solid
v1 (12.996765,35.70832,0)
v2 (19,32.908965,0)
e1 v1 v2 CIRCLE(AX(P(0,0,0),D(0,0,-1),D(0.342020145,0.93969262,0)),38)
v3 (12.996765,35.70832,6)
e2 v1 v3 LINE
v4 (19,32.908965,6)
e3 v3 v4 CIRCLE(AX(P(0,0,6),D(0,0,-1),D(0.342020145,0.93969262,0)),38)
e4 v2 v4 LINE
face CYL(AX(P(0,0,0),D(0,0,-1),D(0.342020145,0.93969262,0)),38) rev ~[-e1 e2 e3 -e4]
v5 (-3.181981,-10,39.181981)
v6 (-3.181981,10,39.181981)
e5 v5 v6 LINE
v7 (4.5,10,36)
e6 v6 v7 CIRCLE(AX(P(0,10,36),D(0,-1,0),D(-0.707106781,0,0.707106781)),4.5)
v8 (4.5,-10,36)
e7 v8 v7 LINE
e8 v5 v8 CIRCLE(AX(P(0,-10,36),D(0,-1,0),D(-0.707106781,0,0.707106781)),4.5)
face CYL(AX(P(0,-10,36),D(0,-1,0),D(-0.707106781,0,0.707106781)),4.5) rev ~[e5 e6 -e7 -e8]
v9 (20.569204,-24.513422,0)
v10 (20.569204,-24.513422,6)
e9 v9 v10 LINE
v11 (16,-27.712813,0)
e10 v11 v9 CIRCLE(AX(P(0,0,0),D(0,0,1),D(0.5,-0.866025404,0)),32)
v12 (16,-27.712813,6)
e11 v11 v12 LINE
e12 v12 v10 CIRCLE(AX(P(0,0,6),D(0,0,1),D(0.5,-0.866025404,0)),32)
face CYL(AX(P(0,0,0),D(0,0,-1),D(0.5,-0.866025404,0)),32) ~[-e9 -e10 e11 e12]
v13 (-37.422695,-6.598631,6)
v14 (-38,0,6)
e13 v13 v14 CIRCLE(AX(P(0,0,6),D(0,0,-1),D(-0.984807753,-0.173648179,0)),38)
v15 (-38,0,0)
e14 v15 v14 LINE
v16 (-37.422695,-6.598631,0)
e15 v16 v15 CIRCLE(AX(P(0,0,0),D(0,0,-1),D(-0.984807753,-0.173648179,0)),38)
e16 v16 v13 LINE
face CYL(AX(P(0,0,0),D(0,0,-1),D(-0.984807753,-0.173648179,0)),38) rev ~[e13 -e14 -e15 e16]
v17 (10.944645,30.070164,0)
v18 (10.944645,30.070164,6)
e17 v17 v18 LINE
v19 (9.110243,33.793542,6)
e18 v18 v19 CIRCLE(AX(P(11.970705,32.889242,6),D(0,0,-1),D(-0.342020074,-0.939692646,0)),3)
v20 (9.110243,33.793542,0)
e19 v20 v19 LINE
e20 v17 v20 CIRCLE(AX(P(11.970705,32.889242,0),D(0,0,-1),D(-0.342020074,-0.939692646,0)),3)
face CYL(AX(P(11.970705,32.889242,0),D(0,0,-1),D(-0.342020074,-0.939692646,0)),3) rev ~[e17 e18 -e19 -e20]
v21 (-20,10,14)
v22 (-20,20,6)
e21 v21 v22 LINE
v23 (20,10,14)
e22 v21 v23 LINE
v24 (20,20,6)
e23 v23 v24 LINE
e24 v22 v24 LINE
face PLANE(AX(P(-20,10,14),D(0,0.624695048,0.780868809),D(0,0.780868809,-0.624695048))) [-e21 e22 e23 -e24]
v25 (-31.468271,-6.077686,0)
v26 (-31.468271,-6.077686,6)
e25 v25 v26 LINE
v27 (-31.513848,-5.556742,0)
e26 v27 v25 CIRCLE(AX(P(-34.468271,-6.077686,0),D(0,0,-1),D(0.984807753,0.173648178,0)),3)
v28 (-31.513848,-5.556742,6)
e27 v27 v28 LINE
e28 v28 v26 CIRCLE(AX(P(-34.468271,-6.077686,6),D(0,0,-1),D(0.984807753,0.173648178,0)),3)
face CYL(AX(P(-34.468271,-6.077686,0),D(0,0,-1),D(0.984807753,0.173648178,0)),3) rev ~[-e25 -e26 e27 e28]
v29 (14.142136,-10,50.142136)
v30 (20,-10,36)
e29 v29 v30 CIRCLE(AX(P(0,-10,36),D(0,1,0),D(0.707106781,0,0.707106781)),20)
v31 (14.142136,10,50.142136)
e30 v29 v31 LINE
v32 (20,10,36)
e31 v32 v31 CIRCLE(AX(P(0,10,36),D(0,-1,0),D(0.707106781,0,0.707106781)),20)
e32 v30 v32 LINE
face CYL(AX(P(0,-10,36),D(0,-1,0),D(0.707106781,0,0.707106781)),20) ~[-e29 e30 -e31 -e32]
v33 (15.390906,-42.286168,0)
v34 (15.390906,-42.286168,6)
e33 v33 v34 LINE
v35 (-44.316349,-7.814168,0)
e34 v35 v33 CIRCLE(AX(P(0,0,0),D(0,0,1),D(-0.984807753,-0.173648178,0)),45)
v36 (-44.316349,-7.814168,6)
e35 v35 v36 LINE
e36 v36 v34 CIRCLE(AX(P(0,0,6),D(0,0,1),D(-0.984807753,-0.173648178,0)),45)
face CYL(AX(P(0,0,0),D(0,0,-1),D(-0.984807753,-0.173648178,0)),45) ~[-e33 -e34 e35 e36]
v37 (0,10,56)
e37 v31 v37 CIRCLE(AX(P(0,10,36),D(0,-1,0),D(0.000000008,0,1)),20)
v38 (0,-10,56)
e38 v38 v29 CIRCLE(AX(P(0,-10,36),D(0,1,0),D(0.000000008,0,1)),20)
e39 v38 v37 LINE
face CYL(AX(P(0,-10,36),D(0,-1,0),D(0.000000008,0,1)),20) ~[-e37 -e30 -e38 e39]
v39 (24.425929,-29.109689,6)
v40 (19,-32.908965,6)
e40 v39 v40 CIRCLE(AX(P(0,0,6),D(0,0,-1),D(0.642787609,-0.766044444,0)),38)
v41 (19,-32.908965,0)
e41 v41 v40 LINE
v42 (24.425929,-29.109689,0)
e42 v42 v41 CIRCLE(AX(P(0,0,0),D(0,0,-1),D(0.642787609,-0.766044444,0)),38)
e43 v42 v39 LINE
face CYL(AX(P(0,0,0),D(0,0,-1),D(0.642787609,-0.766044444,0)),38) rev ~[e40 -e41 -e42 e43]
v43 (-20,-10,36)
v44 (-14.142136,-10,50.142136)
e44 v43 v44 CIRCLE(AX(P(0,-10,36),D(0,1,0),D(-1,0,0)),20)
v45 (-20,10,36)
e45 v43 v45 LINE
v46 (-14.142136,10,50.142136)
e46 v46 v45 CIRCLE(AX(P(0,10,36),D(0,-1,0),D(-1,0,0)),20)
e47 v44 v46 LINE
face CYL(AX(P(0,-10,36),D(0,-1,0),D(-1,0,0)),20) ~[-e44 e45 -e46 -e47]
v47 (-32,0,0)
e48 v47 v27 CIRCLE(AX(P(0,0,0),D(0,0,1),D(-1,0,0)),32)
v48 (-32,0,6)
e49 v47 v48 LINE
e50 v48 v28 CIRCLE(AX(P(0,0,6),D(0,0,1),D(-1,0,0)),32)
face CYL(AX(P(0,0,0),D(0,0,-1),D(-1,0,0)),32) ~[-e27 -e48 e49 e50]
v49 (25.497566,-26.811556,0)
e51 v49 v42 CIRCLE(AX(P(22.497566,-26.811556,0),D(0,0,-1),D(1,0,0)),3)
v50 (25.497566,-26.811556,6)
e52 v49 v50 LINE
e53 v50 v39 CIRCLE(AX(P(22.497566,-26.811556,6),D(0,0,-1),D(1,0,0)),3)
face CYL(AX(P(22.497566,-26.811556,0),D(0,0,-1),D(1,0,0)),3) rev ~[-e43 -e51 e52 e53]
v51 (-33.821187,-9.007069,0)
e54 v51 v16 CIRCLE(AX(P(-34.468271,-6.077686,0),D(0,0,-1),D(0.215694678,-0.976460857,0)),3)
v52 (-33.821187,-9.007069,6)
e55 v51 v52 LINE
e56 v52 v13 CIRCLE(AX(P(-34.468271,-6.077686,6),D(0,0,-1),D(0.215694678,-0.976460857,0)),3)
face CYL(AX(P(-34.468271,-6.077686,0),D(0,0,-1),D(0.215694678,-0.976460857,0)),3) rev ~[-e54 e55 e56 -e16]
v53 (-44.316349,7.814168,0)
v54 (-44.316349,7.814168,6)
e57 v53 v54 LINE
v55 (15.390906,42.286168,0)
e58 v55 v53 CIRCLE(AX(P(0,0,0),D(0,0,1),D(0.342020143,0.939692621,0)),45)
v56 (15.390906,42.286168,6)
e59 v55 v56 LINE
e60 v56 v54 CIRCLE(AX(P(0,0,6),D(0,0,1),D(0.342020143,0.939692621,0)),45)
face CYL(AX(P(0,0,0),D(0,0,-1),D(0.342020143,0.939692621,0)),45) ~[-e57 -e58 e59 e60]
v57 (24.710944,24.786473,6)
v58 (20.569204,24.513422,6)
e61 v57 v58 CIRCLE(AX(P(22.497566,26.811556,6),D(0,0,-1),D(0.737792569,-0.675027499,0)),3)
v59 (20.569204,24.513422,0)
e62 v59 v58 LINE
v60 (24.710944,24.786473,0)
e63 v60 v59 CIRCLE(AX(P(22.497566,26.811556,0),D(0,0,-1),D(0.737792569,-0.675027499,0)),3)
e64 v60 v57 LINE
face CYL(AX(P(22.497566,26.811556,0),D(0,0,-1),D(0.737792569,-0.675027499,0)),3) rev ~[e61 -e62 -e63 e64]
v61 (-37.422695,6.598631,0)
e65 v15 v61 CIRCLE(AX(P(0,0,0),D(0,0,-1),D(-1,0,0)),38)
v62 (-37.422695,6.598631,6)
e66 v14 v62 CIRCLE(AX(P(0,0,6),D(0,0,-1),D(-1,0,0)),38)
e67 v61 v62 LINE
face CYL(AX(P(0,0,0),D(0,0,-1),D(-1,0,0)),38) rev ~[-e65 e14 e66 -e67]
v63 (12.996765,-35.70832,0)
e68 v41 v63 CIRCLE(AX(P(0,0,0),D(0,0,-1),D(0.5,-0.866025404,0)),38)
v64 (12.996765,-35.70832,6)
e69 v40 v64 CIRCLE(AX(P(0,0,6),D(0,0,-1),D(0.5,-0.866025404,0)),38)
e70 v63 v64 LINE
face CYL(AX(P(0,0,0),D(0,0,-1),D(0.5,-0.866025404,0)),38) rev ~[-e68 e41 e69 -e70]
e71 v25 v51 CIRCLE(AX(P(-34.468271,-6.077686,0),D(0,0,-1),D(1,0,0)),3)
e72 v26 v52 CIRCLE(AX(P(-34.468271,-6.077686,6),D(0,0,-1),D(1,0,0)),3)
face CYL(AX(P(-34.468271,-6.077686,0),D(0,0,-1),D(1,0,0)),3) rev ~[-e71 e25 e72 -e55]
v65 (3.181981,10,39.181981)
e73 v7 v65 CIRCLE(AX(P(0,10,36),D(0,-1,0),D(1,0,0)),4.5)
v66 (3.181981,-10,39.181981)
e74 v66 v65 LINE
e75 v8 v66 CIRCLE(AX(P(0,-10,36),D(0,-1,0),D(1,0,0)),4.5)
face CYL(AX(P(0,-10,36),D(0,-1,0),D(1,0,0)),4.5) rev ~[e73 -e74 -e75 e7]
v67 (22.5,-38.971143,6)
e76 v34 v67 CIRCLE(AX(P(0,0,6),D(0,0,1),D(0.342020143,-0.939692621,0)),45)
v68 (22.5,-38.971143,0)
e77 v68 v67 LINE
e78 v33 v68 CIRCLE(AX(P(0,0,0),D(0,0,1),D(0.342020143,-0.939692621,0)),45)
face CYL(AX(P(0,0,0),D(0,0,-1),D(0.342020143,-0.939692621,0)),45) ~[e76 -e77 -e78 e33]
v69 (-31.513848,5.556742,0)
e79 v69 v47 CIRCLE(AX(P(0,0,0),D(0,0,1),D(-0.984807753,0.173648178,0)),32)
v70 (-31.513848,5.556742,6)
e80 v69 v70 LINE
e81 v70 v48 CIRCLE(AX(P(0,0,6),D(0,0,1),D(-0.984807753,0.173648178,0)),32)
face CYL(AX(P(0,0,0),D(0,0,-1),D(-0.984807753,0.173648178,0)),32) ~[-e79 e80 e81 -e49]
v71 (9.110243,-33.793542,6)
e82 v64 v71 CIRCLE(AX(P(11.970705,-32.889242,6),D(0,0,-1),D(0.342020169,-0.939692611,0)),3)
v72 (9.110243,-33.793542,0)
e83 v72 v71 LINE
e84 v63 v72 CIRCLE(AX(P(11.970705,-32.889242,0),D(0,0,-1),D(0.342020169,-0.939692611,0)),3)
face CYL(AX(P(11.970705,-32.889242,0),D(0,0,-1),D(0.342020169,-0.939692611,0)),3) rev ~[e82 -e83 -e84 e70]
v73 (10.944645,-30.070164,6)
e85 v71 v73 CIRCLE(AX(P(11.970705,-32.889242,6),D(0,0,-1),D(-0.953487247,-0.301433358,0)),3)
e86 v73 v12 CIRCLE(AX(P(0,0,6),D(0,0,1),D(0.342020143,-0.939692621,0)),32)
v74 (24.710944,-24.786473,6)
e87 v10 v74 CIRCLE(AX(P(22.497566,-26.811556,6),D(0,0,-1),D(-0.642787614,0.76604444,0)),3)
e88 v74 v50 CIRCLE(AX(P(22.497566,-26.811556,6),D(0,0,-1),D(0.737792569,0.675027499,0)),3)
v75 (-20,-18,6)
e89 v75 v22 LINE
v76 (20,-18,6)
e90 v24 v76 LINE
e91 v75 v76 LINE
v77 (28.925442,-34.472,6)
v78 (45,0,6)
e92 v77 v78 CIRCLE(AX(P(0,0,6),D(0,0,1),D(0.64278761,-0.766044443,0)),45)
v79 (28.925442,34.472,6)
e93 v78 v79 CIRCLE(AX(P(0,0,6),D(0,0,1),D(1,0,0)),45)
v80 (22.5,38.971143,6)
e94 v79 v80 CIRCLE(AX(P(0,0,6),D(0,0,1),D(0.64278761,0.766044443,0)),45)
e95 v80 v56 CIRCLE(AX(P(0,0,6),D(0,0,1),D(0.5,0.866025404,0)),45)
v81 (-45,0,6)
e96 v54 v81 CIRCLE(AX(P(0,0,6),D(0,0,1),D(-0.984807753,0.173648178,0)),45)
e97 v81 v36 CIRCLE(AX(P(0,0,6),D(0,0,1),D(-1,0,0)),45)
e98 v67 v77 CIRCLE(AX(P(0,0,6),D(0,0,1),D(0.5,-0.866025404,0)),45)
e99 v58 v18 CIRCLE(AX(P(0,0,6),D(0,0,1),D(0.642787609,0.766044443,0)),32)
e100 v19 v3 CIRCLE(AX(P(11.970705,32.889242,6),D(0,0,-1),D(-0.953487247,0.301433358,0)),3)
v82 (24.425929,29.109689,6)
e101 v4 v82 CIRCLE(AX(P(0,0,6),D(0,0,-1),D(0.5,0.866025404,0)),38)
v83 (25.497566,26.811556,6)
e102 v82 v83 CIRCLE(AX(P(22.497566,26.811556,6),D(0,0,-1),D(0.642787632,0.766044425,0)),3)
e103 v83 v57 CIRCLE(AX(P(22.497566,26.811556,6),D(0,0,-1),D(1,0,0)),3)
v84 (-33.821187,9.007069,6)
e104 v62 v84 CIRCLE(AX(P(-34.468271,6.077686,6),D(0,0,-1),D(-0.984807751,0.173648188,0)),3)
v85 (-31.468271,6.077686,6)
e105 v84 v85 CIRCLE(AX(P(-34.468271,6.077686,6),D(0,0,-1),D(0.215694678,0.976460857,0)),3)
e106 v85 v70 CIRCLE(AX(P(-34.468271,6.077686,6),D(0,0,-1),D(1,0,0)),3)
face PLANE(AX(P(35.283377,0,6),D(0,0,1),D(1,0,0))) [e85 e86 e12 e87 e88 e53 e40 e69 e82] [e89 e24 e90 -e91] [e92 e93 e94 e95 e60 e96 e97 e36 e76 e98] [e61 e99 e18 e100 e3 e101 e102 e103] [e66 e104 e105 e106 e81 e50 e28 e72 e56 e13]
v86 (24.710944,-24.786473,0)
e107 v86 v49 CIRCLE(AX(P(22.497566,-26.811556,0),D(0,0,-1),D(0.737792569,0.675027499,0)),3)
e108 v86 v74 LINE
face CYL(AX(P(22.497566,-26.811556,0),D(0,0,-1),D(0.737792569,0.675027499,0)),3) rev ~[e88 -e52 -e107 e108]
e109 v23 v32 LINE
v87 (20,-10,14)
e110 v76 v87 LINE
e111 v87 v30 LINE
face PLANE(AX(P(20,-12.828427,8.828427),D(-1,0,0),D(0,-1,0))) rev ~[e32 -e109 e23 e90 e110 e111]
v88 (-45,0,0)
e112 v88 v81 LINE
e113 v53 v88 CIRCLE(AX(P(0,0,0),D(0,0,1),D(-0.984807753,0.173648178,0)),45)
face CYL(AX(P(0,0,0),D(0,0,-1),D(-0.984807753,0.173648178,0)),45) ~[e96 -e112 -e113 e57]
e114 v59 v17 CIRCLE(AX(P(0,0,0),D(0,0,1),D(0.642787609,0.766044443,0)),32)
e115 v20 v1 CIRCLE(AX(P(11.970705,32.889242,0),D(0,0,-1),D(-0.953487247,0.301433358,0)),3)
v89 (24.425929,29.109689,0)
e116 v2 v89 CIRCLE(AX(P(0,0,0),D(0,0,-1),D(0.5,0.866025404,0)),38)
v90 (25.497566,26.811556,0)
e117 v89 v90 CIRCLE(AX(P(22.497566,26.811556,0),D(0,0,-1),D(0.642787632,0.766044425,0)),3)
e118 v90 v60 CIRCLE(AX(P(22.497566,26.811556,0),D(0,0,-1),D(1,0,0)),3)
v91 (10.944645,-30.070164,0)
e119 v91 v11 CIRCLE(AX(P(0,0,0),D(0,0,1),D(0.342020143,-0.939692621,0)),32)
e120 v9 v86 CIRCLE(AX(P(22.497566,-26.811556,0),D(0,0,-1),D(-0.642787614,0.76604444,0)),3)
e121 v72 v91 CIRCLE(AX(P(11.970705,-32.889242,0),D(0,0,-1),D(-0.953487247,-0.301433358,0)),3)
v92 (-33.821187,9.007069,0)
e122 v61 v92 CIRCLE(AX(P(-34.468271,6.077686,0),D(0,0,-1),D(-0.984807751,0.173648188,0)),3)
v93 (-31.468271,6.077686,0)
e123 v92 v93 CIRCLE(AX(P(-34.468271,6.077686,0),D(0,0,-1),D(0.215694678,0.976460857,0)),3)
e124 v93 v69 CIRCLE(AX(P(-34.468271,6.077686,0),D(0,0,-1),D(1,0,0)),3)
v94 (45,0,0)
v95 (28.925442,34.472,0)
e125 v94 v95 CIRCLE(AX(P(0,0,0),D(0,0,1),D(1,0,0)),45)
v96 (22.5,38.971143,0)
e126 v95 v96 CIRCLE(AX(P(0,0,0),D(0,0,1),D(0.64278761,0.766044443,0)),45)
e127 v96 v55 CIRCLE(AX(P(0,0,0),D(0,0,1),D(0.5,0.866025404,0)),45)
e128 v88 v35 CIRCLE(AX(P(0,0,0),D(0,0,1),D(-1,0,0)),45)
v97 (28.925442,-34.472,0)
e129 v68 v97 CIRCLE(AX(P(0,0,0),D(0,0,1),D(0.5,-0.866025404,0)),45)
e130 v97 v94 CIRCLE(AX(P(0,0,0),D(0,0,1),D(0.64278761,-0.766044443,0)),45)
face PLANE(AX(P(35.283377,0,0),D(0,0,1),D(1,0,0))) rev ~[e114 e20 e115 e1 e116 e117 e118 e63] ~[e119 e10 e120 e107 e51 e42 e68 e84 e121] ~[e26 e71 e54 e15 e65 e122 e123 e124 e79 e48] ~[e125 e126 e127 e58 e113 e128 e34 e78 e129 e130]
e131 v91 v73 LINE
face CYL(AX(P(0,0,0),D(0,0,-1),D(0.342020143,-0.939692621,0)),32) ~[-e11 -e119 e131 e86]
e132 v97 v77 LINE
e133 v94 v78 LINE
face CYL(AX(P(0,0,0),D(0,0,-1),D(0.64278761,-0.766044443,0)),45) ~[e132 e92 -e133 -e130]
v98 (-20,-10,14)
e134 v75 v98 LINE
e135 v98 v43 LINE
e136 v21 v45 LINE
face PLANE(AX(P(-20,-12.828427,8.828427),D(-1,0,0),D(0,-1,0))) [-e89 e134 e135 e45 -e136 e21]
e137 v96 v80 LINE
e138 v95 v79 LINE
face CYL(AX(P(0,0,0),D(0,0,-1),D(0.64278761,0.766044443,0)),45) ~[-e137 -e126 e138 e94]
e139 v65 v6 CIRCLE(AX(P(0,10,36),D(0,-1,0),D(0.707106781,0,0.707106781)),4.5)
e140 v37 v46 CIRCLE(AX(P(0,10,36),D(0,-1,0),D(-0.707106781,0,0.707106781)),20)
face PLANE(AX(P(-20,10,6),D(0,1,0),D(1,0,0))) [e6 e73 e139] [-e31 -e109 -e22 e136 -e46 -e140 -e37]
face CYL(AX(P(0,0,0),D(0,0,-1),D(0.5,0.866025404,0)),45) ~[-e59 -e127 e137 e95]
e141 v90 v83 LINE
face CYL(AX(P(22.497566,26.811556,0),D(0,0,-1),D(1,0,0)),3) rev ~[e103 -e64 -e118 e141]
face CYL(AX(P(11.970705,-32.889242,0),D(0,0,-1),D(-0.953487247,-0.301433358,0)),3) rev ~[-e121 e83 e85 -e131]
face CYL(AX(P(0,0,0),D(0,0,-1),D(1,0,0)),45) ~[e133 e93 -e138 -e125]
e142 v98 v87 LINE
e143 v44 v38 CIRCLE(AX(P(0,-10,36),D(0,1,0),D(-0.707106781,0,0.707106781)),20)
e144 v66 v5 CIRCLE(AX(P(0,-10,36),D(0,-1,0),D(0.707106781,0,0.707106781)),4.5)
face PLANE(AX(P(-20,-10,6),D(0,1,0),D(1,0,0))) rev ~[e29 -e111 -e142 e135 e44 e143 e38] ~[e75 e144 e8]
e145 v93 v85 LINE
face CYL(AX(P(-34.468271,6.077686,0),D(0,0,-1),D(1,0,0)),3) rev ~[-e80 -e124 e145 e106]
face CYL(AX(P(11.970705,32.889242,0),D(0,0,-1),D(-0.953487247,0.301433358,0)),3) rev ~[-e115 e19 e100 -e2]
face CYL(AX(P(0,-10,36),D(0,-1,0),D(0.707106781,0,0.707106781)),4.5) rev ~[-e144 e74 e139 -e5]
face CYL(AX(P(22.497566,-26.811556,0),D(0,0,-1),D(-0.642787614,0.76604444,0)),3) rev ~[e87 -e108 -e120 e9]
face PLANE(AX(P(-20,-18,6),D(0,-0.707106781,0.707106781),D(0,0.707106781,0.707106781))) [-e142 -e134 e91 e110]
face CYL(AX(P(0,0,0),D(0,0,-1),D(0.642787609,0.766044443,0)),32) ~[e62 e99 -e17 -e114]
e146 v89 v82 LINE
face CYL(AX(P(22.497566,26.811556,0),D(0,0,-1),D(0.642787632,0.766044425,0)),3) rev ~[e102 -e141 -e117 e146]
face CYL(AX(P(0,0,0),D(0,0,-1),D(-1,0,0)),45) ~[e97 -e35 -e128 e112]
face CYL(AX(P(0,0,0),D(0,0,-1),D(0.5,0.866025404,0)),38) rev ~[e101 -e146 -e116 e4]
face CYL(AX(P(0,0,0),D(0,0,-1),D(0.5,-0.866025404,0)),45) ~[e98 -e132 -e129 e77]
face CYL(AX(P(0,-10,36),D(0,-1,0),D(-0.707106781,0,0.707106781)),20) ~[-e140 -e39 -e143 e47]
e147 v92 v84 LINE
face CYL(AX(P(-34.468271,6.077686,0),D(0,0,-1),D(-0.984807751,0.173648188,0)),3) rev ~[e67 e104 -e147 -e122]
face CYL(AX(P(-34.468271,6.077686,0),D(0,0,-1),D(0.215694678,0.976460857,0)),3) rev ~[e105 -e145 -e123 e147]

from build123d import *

# Parameters (mm, degrees)
F1_DEPTH = 6
F2_W     = 40
F2_H     = 20
F3_DEPTH = 50
F5_DEPTH = 40
F7_DEPTH = 30
F8_DEPTH = 30


# Not quite as in the source:
# - ends of sketch curves that miss each other by under 0.0002 mm in the source are joined


with BuildPart() as f1:
    # F0 (on Top) → F1 (new body)
    with BuildSketch(Plane.XY):
        with BuildLine():
            ThreePointArc((28.9254424359, -34.4719999404), (40.7838504166, -19.0178217783), (45, 0))
            ThreePointArc((45, 0), (40.7838504166, 19.0178217783), (28.9254424359, 34.4719999404))
            Line((28.9254424359, 34.4719999404), (24.4259291681, 29.1096888385))
            ThreePointArc((24.4259292345, 29.1096887828), (34.4396959257, 16.0594939069), (38, 0))
            ThreePointArc((38, 0), (34.4396959, -16.059493962), (24.4259291412, -29.1096888611))
            Line((24.4259291681, -29.1096888385), (28.9254424359, -34.4719999404))
        make_face()
        with BuildLine():
            ThreePointArc((22.5, -38.9711431703), (25.8109396358, -36.861841993), (28.9254424359, -34.4719999404))
            Line((28.9254424359, -34.4719999404), (24.4259291681, -29.1096888385))
            ThreePointArc((24.4259291412, -29.1096888611), (21.795904567, -31.127777693), (19, -32.9089653438))
            Line((19, -32.9089653438), (22.5, -38.9711431703))
        make_face()
        with BuildLine():
            ThreePointArc((15.3909064497, -42.2861679354), (19.0178217783, -40.7838504166), (22.5, -38.9711431703))
            Line((22.5, -38.9711431703), (19, -32.9089653438))
            ThreePointArc((19, -32.9089653438), (16.0594939837, -34.4396958899), (12.9967655243, -35.7083195615))
            Line((12.9967654464, -35.7083195899), (15.3909064497, -42.2861679354))
        make_face()
        with BuildLine():
            ThreePointArc((-44.3163488855, -7.814167995), (-22.5, -38.9711431703), (15.3909064497, -42.2861679354))
            Line((15.3909064497, -42.2861679354), (12.9967654464, -35.7083195899))
            ThreePointArc((12.9967655243, -35.7083195615), (-18.9999999457, -32.9089653752), (-37.4226946071, -6.5986307931))
            Line((-37.4226946145, -6.5986307513), (-44.3163488855, -7.814167995))
        make_face()
        with BuildLine():
            ThreePointArc((-37.4226946071, -6.5986307931), (-18.9999999457, -32.9089653752), (12.9967655243, -35.7083195615))
            ThreePointArc((12.9967655243, -35.7083195615), (10.6448654939, -35.5803659462), (9.1102432746, -33.7935418013))
            ThreePointArc((9.1102432746, -33.7935418013), (-17.5, -30.3108891325), (-33.8211873211, -9.0070687902))
            ThreePointArc((-33.8211873211, -9.0070687902), (-36.1359334802, -8.5714590704), (-37.4226946071, -6.5986307931))
        make_face()
        with BuildLine():
            ThreePointArc((-33.8211873211, -9.0070687902), (-17.5, -30.3108891325), (9.1102432746, -33.7935418013))
            ThreePointArc((9.1102432746, -33.7935418013), (9.2795808611, -31.5634020763), (10.9446447781, -30.0701637954))
            ThreePointArc((10.9446447781, -30.0701637954), (-15.9999999119, -27.712812972), (-31.5138480965, -5.5567416849))
            ThreePointArc((-31.5138480965, -5.5567416849), (-31.4796872612, -5.8162189899), (-31.4682713554, -6.0776862183))
            ThreePointArc((-31.4682713554, -6.0776862183), (-32.1293344064, -7.956349027), (-33.8211873211, -9.0070687902))
        make_face()
        with BuildLine():
            Line((10.9446445864, -30.0701638651), (0, 0))
            Line((0, 0), (-31.5138480964, -5.5567416853))
            ThreePointArc((-31.5138480964, -5.5567416853), (-15.9999999119, -27.712812972), (10.9446445864, -30.0701638651))
        make_face()
        with BuildLine():
            Line((-31.5138480964, -5.5567416853), (0, 0))
            Line((0, 0), (-32, 0))
            ThreePointArc((-32, 0), (-31.878230339, -2.7889837677), (-31.5138480965, -5.5567416849))
        make_face()
        with BuildLine():
            Line((-32, 0), (0, 0))
            Line((0, 0), (-31.5138480964, 5.5567416853))
            ThreePointArc((-31.5138480966, 5.5567416843), (-31.878230339, 2.7889837674), (-32, 0))
        make_face()
        with BuildLine():
            ThreePointArc((-45, 0), (-44.8287614141, -3.9220084236), (-44.3163488855, -7.814167995))
            Line((-44.3163488855, -7.814167995), (-37.4226946145, -6.5986307513))
            ThreePointArc((-37.4226946071, -6.5986307931), (-37.8553985256, -3.3119182456), (-38, 0))
            Line((-38, 0), (-45, 0))
        make_face()
        with BuildLine():
            Line((-37.4226946145, 6.5986307513), (-44.3163488855, 7.814167995))
            ThreePointArc((-44.3163488855, 7.814167995), (-44.8287614141, 3.9220084236), (-45, 0))
            Line((-45, 0), (-38, 0))
            ThreePointArc((-38, 0), (-37.8553985261, 3.3119182405), (-37.4226946089, 6.5986307831))
        make_face()
        with BuildLine():
            Line((12.9967654464, 35.7083195899), (15.3909064497, 42.2861679354))
            ThreePointArc((15.3909064497, 42.2861679354), (-22.5, 38.9711431703), (-44.3163488855, 7.814167995))
            Line((-44.3163488855, 7.814167995), (-37.4226946145, 6.5986307513))
            ThreePointArc((-37.4226946089, 6.5986307831), (-18.9999999501, 32.9089653726), (12.9967655243, 35.7083195615))
        make_face()
        with BuildLine():
            ThreePointArc((9.1102432746, 33.7935418013), (10.6448654939, 35.5803659462), (12.9967655243, 35.7083195615))
            ThreePointArc((12.9967655243, 35.7083195615), (-18.9999999501, 32.9089653726), (-37.4226946089, 6.5986307831))
            ThreePointArc((-37.4226946089, 6.5986307831), (-36.1359334844, 8.5714590676), (-33.8211873211, 9.0070687902))
            ThreePointArc((-33.8211873211, 9.0070687902), (-17.5, 30.3108891325), (9.1102432746, 33.7935418013))
        make_face()
        with BuildLine():
            Line((-31.5138480964, 5.5567416853), (0, 0))
            Line((0, 0), (10.9446445864, 30.0701638651))
            ThreePointArc((10.9446445864, 30.0701638651), (-15.9999999047, 27.7128129761), (-31.5138480964, 5.5567416853))
        make_face()
        with BuildLine():
            ThreePointArc((10.9446447943, 30.0701637895), (9.2795808649, 31.5634020686), (9.1102432746, 33.7935418013))
            ThreePointArc((9.1102432746, 33.7935418013), (-17.5, 30.3108891325), (-33.8211873211, 9.0070687902))
            ThreePointArc((-33.8211873211, 9.0070687902), (-32.1293344064, 7.956349027), (-31.4682713554, 6.0776862183))
            ThreePointArc((-31.4682713554, 6.0776862183), (-31.4796872612, 5.8162189895), (-31.5138480966, 5.5567416843))
            ThreePointArc((-31.5138480966, 5.5567416843), (-15.9999999047, 27.7128129761), (10.9446447943, 30.0701637895))
        make_face()
        with BuildLine():
            Line((19, 32.9089653438), (22.5, 38.9711431703))
            ThreePointArc((22.5, 38.9711431703), (19.0178217783, 40.7838504166), (15.3909064497, 42.2861679354))
            Line((15.3909064497, 42.2861679354), (12.9967654464, 35.7083195899))
            ThreePointArc((12.9967655243, 35.7083195615), (16.0594939837, 34.4396958899), (19, 32.9089653438))
        make_face()
        with BuildLine():
            Line((24.4259291681, 29.1096888385), (28.9254424359, 34.4719999404))
            ThreePointArc((28.9254424359, 34.4719999404), (25.8109396358, 36.861841993), (22.5, 38.9711431703))
            Line((22.5, 38.9711431703), (19, 32.9089653438))
            ThreePointArc((19, 32.9089653438), (21.7959046168, 31.1277776581), (24.4259292345, 29.1096887828))
        make_face()
        with BuildLine():
            Line((0, 0), (20.56920351, 24.5134221798))
            ThreePointArc((20.5692034907, 24.5134221959), (18.354445953, 26.2128654244), (16, 27.7128129211))
            Line((16, 27.7128129211), (0, 0))
        make_face()
        with BuildLine():
            Line((0, 0), (16, 27.7128129211))
            ThreePointArc((16, 27.7128129211), (13.523784476, 29.0018491384), (10.9446447943, 30.0701637895))
            Line((10.9446447943, 30.0701637895), (0, 0))
        make_face()
        with BuildLine():
            ThreePointArc((32, 0), (29.0018491799, 13.5237843871), (20.5692034907, 24.5134221959))
            Line((20.56920351, 24.5134221798), (0, 0))
            Line((0, 0), (20.56920351, -24.5134221798))
            ThreePointArc((20.5692034979, -24.5134221899), (29.0018491818, -13.5237843828), (32, 0))
        make_face()
        with BuildLine():
            ThreePointArc((16, -27.7128129211), (18.3544459568, -26.2128654218), (20.5692034979, -24.5134221899))
            Line((20.56920351, -24.5134221798), (0, 0))
            Line((0, 0), (16, -27.7128129211))
        make_face()
        with BuildLine():
            Line((16, -27.7128129211), (0, 0))
            Line((0, 0), (10.9446445864, -30.0701638651))
            ThreePointArc((10.9446445864, -30.0701638651), (13.5237844681, -29.0018491421), (16, -27.7128129211))
        make_face()
        with BuildLine():
            ThreePointArc((35, 0), (32.3255552282, 13.4185870786), (24.7109440465, 24.7864730111))
            ThreePointArc((24.7109440465, 24.7864730111), (22.6949176866, 23.8180538062), (20.5692034907, 24.5134221959))
            ThreePointArc((20.5692034907, 24.5134221959), (29.0018491799, 13.5237843871), (32, 0))
            ThreePointArc((32, 0), (29.0018491818, -13.5237843828), (20.5692034979, -24.5134221899))
            ThreePointArc((20.5692034979, -24.5134221899), (22.6949176913, -23.8180538065), (24.7109440465, -24.7864730111))
            ThreePointArc((24.7109440465, -24.7864730111), (32.3255552282, -13.4185870786), (35, 0))
        make_face()
        with BuildLine():
            ThreePointArc((38, 0), (34.4396959257, 16.0594939069), (24.4259292345, 29.1096887828))
            ThreePointArc((24.4259292345, 29.1096887828), (25.2164897185, 28.0794102551), (25.497566339, 26.8115555092))
            ThreePointArc((25.497566339, 26.8115555092), (25.294004531, 25.7253080978), (24.7109440465, 24.7864730111))
            ThreePointArc((24.7109440465, 24.7864730111), (32.3255552282, 13.4185870786), (35, 0))
            ThreePointArc((35, 0), (32.3255552282, -13.4185870786), (24.7109440465, -24.7864730111))
            ThreePointArc((24.7109440465, -24.7864730111), (25.294004531, -25.7253080978), (25.497566339, -26.8115555092))
            ThreePointArc((25.497566339, -26.8115555092), (25.2164896927, -28.0794103103), (24.4259291412, -29.1096888611))
            ThreePointArc((24.4259291412, -29.1096888611), (34.4396959, -16.059493962), (38, 0))
        make_face()
    extrude(amount=F1_DEPTH)

    # F2 (on face) → F3 (join)
    with BuildSketch(Plane.XY.offset(6)):
        Rectangle(F2_W, F2_H)
    extrude(amount=F3_DEPTH)

    # F4 (on face) → F5 (join)
    with BuildSketch(Plane(origin=(-20, 0, 0), x_dir=(0, -1, 0), z_dir=(-1, 0, 0))):
        Polygon((10, 14), (10, 6), (18, 6), align=None)
        Polygon((-10, 14), (-20, 6), (-10, 6), align=None)
    extrude(amount=-F5_DEPTH)

    # F6 (on face) → F7 (cut)
    with BuildSketch(Plane.XZ.offset(10)):
        with BuildLine():
            Line((-14.1421356237, 50.1421356237), (-20, 56))
            Line((-20, 56), (-20, 36))
            ThreePointArc((-20, 36), (-18.4775906502, 43.6536686473), (-14.1421356237, 50.1421356237))
        make_face()
        with BuildLine():
            Line((1.654e-07, 56), (-20, 56))
            Line((-20, 56), (-14.1421356237, 50.1421356237))
            ThreePointArc((-14.1421356237, 50.1421356237), (-7.6536685709, 54.4775906819), (1.654e-07, 56))
        make_face()
        with BuildLine():
            Line((20, 56), (1.654e-07, 56))
            ThreePointArc((1.654e-07, 56), (7.6536687237, 54.4775906186), (14.1421356237, 50.1421356237))
            Line((14.1421356237, 50.1421356237), (20, 56))
        make_face()
        with BuildLine():
            Line((20, 56), (14.1421356237, 50.1421356237))
            ThreePointArc((14.1421356237, 50.1421356237), (18.4775906502, 43.6536686473), (20, 36))
            Line((20, 36), (20, 56))
        make_face()
    extrude(amount=-F7_DEPTH, mode=Mode.SUBTRACT)

    # F6 (on face) → F8 (cut)
    with BuildSketch(Plane.XZ.offset(10)):
        with BuildLine():
            Line((0, 36), (-3.1819805153, 39.1819805153))
            ThreePointArc((-3.1819805153, 39.1819805153), (-1.7220754456, 31.8425421037), (4.5, 36))
            ThreePointArc((4.5, 36), (4.1574578963, 37.7220754456), (3.1819805153, 39.1819805153))
            Line((3.1819805153, 39.1819805153), (0, 36))
        make_face()
        with BuildLine():
            ThreePointArc((3.1819805153, 39.1819805153), (0, 40.5), (-3.1819805153, 39.1819805153))
            Line((-3.1819805153, 39.1819805153), (0, 36))
            Line((0, 36), (3.1819805153, 39.1819805153))
        make_face()
    extrude(amount=-F8_DEPTH, mode=Mode.SUBTRACT)


solid = f1.part
